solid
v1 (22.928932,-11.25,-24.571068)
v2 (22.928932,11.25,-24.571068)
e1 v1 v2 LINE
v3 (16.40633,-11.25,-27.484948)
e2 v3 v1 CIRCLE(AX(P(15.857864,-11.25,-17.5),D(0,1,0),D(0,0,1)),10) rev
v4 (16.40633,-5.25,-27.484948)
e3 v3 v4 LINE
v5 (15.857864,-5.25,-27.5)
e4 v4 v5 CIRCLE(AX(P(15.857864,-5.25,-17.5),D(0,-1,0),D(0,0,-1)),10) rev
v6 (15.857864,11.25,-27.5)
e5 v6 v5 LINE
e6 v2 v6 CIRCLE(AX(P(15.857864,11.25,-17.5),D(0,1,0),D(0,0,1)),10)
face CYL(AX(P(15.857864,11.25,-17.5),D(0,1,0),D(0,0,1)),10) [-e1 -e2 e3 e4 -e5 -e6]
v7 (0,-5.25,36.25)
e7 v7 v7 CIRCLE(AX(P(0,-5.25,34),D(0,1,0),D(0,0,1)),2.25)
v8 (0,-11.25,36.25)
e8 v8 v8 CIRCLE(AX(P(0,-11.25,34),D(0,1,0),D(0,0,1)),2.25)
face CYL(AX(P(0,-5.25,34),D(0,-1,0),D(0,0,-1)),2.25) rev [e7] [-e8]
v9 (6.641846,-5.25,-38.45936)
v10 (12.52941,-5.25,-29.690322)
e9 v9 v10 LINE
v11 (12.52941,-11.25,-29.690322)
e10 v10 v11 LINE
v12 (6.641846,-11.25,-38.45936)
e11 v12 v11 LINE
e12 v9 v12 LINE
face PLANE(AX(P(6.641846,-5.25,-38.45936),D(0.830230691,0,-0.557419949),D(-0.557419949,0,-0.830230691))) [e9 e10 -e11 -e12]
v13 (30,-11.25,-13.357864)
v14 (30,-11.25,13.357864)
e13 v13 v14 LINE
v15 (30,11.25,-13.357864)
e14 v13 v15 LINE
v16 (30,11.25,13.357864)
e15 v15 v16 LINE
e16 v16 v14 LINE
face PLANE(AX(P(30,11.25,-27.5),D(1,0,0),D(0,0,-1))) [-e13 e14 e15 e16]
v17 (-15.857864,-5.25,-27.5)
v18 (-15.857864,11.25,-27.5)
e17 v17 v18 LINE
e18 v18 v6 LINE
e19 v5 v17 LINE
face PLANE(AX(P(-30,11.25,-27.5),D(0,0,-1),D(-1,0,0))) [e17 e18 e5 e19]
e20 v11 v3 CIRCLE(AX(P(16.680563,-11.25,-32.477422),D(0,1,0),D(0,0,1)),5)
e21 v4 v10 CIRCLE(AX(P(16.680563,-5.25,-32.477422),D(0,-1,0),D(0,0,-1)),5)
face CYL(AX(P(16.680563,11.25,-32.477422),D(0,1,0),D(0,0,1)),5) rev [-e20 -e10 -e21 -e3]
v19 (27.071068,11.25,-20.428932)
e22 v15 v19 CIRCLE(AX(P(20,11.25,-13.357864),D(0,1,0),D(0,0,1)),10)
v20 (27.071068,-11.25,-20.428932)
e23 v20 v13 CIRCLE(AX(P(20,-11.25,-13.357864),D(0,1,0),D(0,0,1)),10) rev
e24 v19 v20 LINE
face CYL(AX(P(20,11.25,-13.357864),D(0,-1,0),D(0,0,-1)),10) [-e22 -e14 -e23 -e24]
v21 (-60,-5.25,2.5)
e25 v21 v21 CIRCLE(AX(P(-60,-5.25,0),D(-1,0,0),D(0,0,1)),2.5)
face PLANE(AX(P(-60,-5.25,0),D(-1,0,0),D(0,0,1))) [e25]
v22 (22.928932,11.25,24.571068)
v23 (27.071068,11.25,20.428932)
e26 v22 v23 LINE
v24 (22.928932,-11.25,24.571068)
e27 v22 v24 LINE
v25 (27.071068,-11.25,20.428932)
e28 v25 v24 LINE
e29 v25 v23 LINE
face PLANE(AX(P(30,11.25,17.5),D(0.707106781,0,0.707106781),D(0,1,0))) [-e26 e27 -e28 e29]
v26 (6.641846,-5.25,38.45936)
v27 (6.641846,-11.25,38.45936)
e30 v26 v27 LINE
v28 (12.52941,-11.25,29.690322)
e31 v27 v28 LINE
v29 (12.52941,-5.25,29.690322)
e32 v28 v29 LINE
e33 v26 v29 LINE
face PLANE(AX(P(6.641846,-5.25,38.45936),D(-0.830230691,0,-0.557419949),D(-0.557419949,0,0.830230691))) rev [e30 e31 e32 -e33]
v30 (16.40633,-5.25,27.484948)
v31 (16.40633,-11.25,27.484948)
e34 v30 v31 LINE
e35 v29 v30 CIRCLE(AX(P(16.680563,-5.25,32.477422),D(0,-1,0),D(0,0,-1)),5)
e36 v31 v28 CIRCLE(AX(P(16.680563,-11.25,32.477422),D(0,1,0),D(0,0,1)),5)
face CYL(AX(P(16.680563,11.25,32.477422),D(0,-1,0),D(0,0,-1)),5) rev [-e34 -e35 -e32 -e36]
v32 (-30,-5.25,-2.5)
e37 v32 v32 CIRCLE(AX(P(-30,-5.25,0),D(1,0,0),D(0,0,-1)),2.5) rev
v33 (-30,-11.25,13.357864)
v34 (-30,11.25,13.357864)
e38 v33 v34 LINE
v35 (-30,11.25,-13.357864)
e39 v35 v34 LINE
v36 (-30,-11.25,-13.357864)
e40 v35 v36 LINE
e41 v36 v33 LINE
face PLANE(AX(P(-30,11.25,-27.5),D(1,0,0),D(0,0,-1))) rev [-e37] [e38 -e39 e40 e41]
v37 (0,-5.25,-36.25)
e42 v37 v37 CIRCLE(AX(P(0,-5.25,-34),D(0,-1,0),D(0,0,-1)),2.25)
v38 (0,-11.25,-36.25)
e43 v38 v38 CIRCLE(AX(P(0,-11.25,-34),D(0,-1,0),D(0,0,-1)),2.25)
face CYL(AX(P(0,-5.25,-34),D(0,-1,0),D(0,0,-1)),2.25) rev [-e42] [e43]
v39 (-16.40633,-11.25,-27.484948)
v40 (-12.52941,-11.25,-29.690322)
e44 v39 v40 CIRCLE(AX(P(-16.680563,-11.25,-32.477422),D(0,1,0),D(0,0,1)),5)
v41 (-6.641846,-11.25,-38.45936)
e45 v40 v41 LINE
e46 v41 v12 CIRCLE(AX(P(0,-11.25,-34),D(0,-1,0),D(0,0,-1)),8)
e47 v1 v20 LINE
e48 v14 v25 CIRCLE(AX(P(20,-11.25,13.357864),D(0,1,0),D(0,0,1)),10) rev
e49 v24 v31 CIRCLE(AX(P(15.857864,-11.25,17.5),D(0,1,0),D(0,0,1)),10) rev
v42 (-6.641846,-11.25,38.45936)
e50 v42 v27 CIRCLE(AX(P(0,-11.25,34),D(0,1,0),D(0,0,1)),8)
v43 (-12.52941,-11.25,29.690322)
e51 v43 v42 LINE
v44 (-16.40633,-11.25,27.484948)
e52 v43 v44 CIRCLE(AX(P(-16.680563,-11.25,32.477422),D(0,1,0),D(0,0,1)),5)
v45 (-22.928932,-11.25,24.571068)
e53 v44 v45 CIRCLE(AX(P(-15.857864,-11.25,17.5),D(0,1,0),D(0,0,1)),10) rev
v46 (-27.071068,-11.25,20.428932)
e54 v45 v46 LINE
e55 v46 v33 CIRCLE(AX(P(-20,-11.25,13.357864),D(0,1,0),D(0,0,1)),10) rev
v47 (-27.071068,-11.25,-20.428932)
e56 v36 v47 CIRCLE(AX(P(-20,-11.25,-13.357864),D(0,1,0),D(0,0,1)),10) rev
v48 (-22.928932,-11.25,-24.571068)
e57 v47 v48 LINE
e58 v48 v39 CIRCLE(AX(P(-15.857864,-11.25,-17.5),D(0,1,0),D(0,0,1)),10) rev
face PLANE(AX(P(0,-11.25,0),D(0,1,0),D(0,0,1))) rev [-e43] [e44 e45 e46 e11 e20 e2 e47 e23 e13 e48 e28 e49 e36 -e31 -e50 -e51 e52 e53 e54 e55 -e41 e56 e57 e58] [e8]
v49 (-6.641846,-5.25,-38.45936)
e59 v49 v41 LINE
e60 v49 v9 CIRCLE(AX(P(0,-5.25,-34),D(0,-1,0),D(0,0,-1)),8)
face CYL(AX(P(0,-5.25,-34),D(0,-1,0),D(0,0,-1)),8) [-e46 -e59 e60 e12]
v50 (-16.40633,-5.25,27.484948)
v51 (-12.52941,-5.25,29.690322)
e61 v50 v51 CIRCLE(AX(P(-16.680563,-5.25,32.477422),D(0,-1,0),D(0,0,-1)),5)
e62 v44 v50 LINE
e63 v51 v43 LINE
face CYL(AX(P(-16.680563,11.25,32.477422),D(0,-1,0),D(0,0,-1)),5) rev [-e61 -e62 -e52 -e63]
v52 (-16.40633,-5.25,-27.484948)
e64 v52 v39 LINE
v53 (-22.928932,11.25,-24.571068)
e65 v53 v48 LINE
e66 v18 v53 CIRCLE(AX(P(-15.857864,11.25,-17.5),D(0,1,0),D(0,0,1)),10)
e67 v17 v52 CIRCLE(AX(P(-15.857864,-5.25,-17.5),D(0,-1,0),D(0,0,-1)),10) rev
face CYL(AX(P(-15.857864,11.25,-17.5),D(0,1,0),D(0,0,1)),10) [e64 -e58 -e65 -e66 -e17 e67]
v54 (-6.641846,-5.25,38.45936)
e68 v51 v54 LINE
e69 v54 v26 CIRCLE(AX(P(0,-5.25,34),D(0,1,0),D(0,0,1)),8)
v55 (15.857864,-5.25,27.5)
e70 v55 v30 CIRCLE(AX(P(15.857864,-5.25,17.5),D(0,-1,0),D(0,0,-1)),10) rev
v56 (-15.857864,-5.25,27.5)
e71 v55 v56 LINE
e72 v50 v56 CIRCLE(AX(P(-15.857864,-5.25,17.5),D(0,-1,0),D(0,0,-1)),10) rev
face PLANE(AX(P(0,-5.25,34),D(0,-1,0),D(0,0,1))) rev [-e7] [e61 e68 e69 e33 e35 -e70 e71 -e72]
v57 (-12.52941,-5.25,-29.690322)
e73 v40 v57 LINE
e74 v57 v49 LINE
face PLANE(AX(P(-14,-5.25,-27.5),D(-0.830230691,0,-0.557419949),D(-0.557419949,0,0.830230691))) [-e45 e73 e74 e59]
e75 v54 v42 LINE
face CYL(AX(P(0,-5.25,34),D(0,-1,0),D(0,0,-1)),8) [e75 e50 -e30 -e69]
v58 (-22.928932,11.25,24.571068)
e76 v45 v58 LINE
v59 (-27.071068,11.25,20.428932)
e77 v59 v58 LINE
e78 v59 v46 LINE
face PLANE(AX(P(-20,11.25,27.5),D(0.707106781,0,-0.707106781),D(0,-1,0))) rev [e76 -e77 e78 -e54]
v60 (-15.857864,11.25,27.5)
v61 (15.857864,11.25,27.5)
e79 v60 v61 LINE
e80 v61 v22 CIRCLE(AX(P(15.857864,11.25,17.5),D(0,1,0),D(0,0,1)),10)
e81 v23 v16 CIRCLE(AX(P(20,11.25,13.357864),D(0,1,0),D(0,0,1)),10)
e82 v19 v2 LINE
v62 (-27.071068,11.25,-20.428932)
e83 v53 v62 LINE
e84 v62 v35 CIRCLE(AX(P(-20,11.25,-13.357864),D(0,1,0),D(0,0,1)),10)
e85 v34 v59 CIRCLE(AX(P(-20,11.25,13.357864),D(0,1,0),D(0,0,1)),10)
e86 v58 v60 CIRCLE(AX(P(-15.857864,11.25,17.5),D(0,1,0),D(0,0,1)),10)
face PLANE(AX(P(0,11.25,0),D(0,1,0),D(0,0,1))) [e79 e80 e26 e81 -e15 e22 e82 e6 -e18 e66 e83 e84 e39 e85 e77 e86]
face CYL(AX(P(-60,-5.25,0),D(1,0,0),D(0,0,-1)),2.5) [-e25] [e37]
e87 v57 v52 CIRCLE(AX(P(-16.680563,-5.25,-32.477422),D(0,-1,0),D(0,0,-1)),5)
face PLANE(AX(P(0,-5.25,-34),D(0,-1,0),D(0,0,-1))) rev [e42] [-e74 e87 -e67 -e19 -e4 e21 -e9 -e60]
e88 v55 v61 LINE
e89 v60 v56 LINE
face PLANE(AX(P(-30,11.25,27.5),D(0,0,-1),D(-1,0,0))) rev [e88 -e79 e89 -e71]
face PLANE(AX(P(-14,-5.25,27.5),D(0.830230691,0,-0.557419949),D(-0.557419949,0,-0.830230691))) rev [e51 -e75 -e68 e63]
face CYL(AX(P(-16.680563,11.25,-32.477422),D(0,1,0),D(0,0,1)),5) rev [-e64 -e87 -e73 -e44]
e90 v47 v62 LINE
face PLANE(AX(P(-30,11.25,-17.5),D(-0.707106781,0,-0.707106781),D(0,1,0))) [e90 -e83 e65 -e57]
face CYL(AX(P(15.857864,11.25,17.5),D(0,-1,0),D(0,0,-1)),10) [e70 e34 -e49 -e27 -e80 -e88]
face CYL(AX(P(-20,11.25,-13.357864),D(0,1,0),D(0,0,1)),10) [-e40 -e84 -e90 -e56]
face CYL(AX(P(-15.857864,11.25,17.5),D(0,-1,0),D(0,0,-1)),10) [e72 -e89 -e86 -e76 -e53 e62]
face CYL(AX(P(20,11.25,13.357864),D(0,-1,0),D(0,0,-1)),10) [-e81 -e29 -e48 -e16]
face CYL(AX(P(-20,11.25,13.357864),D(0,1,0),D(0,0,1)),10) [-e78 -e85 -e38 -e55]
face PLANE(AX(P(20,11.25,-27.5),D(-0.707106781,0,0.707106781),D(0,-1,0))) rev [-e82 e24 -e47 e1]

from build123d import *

# Parameters (mm, degrees)
SKETCH1_W           = 60
SKETCH1_H           = 55
BOSS_EXTRUDE1_DEPTH = 11.25
SKETCH2_R           = 2.25
BOSS_EXTRUDE2_DEPTH = 6
CHAMFER1_SIZE       = 10
FILLET1_R           = 10
FILLET2_R           = 5
SKETCH3_R           = 2.5
BOSS_EXTRUDE3_DEPTH = 30


with BuildPart() as part:
    # Sketch1 → Boss-Extrude1 (new, symmetric)
    with BuildSketch(Plane(origin=(0, 0, 0), x_dir=(1, 0, 0), z_dir=(0, 1, 0))):
        Rectangle(SKETCH1_W, SKETCH1_H)
    extrude(amount=BOSS_EXTRUDE1_DEPTH, both=True)

    # Sketch2 → Boss-Extrude2 (add)
    with BuildSketch(Plane.XZ.offset(11.25)):
        with BuildLine():
            Line((-14, -27.5), (-6.641845526, -38.459359596))
            ThreePointArc((-6.641845526, -38.459359596), (0, -42), (6.641845526, -38.459359596))
            Line((6.641845526, -38.459359596), (14, -27.5))
            Line((14, -27.5), (-14, -27.5))
        make_face()
        with Locations(Location((0, -34, 0), (0, 0, 270))):
            Circle(SKETCH2_R, mode=Mode.SUBTRACT)
    boss_extrude2 = extrude(amount=-BOSS_EXTRUDE2_DEPTH)

    # Mirror1: Boss-Extrude2 across plane
    add(boss_extrude2.mirror(Plane.XY))

    # Chamfer1
    chamfer1_edges = [part.edges().sort_by_distance(p)[0] for p in [
        (-30, 0, -27.5),
        (30, 0, -27.5),
        (30, 0, 27.5),
        (-30, 0, 27.5),
    ]]
    chamfer(chamfer1_edges, length=CHAMFER1_SIZE)

    # Fillet1
    fillet1_edges = [part.edges().sort_by_distance(p)[0] for p in [
        (20, 0, 27.5),
        (-20, 0, 27.5),
        (-30, 0, -17.5),
        (-30, 0, 17.5),
        (30, 0, -17.5),
        (30, 0, 17.5),
        (-20, 0, -27.5),
        (20, 0, -27.5),
    ]]
    fillet(fillet1_edges, radius=FILLET1_R)

    # Fillet2
    # the kernel refuses this fillet: 5 mm, written as the material it adds along each edge
    with BuildSketch(Plane(origin=(14, -11.25, -27.5), x_dir=(0.9999804368407044, 0, 0.006255072811241643), z_dir=(0, 1, 0)), Plane(origin=(-14, -11.25, 27.5), x_dir=(-0.9999804368407044, 0, -0.006255072811243166), z_dir=(0, 1, 0))) as fillet2_piece_1:
        with BuildLine():
            CenterArc((2.6493765, 4.994091646), FILLET2_R, 214.235948787, 52.978387625)
            Line((-1.484262233, 2.181080656), (-1.897626106, 1.899779557))
            Line((-1.897626106, 1.899779557), (-0.413363873, -0.281301099))
            Line((-0.413363873, -0.281301099), (0.003127536, -0.499990218))
            ThreePointArc((0.003127536, -0.499990218), (1.860955567, -0.488369141), (2.382077328, -0.499409165))
            Line((2.382077328, -0.499409165), (2.406377253, 0))
        make_face()
    extrude(amount=6)
    with BuildSketch(Plane(origin=(-14, -11.25, -27.5), x_dir=(-0.9999804368407044, 0, 0.00625507281124311), z_dir=(0, 1, 0)), Plane(origin=(14, -11.25, 27.5), x_dir=(0.9999804368407044, 0, -0.006255072811241634), z_dir=(0, 1, 0))) as fillet2_piece_2:
        with BuildLine():
            CenterArc((2.6493765, -4.994091646), FILLET2_R, 92.785663588, 52.978387625)
            Line((-1.484262233, -2.181080656), (-1.897626106, -1.899779557))
            Line((-1.897626106, -1.899779557), (-0.413363873, 0.281301099))
            Line((-0.413363873, 0.281301099), (0.003127536, 0.499990218))
            ThreePointArc((0.003127536, 0.499990218), (1.860955567, 0.488369141), (2.382077328, 0.499409165))
            Line((2.382077328, 0.499409165), (2.406377253, 0))
        make_face()
    extrude(amount=6)

    # Sketch3 → Boss-Extrude3 (add)
    with BuildSketch(Plane.ZY.offset(30)):
        with Locations(Location((0, -5.25, 0), (0, 0, 180))):
            Circle(SKETCH3_R)
    extrude(amount=BOSS_EXTRUDE3_DEPTH)


solid = part.part
